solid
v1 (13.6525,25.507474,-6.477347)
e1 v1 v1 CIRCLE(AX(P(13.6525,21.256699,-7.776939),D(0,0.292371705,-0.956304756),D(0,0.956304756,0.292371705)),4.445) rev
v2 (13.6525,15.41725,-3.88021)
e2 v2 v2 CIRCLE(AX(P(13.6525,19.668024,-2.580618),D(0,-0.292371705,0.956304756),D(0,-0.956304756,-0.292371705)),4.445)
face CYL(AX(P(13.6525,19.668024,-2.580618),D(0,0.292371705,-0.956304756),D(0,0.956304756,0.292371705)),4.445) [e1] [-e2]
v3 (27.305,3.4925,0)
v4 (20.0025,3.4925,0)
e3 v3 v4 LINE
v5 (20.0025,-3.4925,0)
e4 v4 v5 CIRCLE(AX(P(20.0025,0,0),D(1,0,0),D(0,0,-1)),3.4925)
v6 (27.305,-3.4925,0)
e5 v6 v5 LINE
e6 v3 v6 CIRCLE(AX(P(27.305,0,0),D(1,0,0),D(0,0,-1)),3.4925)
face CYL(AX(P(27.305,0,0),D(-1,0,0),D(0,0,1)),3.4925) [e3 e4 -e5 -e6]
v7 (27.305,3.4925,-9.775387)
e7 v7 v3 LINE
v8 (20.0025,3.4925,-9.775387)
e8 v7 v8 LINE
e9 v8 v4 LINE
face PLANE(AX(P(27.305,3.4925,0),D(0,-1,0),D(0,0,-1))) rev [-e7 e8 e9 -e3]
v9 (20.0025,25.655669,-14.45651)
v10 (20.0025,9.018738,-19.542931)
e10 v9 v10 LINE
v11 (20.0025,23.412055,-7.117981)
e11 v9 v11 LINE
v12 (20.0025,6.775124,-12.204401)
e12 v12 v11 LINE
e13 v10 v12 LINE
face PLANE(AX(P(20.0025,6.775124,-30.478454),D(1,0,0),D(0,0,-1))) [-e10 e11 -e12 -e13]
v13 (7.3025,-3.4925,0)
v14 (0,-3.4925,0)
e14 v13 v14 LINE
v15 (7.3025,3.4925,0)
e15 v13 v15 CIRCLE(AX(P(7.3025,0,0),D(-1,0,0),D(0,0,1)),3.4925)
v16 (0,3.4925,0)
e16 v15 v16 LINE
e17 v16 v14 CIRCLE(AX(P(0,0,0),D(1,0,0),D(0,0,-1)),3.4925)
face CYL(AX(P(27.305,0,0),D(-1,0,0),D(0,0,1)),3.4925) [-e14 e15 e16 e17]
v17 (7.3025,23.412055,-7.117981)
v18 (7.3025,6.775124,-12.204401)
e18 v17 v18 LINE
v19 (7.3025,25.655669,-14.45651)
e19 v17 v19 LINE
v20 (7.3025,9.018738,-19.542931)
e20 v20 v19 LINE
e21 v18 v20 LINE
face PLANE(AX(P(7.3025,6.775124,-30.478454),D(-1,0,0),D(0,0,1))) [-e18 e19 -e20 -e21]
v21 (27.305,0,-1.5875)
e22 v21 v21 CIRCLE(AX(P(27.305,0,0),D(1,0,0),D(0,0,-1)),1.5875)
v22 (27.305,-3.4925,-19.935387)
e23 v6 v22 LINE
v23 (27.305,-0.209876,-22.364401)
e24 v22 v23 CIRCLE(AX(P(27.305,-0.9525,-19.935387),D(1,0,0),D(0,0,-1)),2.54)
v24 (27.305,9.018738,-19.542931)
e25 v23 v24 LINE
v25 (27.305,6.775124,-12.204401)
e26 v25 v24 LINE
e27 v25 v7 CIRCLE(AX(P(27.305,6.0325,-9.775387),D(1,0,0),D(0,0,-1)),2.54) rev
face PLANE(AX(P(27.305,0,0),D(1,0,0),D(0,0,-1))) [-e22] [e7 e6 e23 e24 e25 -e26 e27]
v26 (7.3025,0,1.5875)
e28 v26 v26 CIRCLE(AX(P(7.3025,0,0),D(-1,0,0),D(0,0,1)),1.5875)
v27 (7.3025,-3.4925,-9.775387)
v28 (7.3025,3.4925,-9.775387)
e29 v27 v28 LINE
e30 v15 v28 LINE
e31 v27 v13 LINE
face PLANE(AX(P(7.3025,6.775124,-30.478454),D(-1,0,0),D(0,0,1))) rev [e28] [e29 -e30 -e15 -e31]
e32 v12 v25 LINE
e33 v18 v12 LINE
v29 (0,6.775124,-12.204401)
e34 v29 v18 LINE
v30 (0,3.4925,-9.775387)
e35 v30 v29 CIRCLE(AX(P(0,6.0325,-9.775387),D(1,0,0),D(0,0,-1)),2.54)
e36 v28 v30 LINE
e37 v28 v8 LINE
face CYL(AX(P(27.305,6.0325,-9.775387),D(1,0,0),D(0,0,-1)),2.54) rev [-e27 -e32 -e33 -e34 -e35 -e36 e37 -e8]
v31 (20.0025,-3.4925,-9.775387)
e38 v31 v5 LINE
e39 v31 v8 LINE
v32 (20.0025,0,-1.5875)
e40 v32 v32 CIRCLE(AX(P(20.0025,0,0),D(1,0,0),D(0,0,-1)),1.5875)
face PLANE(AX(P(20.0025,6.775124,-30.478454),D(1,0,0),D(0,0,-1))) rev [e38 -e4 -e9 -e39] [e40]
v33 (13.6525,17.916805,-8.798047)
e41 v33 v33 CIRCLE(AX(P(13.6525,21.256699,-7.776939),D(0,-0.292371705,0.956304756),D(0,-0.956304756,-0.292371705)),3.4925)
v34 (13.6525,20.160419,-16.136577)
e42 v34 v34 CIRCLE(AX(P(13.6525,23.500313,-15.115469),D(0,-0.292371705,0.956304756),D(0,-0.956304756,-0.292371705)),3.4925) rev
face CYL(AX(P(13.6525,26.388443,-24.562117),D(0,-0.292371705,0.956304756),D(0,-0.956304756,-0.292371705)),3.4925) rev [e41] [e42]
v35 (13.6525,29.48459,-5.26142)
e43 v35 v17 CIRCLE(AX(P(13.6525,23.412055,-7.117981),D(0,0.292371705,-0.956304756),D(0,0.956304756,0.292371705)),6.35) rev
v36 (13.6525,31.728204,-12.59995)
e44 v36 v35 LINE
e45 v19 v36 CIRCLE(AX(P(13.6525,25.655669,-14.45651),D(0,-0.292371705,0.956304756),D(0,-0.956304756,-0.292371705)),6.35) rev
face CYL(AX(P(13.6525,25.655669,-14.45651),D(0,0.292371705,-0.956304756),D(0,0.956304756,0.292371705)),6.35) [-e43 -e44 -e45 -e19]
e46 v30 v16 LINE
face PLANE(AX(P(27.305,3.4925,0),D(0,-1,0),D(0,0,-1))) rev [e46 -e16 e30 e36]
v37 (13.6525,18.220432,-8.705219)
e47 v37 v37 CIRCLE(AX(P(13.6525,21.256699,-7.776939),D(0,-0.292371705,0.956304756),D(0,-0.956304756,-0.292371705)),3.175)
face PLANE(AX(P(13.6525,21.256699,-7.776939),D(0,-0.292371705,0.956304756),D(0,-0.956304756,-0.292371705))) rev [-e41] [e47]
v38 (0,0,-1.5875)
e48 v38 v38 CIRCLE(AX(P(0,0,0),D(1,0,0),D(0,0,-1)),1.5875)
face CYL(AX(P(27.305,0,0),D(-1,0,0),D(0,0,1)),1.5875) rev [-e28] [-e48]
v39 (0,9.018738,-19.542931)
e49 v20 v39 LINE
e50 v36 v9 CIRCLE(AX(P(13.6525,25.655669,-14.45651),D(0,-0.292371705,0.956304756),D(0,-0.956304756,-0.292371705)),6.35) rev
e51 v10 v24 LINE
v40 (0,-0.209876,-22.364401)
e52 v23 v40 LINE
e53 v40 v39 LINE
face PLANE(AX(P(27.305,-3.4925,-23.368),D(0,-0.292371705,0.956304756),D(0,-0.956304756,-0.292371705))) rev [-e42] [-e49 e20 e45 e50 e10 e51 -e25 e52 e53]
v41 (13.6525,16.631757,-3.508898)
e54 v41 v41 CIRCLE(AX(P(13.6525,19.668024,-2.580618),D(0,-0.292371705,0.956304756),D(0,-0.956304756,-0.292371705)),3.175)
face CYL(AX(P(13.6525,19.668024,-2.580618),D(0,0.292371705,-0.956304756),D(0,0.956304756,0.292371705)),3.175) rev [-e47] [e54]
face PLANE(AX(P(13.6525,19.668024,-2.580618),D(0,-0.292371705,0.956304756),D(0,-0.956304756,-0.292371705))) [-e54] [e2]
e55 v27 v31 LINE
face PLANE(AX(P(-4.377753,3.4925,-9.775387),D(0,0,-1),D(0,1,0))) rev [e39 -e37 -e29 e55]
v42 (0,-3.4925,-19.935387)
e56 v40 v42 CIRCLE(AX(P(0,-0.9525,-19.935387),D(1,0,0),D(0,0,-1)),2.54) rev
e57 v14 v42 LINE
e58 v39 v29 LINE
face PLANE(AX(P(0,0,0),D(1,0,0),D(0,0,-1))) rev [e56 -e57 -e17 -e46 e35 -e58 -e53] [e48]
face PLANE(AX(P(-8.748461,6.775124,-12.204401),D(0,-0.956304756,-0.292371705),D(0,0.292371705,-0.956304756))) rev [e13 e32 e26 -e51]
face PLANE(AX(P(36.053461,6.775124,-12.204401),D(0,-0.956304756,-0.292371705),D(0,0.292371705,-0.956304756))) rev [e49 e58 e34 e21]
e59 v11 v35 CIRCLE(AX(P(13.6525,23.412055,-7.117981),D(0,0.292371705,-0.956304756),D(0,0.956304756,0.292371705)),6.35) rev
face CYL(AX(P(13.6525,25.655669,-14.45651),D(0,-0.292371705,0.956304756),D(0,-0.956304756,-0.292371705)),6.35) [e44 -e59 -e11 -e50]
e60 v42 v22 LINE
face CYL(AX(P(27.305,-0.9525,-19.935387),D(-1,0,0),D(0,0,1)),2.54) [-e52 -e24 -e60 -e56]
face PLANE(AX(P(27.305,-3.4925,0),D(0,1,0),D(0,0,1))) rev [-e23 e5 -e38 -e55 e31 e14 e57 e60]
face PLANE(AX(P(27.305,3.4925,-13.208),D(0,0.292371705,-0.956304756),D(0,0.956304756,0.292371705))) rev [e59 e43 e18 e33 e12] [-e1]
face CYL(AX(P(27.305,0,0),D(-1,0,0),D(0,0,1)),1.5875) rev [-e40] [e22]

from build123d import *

# Parameters (mm, degrees)
SKETCH1_R                      = 1.5875
BOSS_EXTRUDE1_DEPTH            = 27.305
FILLET1_R                      = 2.54
CUT_EXTRUDE1_REACH             = 49.512
SKETCH2_W                      = 12.7
SKETCH2_H                      = 10.26762413
CUT_EXTRUDE1_DIRECTION_2_DEPTH = 48.511945714
SKETCH3_R                      = 4.445
SKETCH3_R_2                    = 3.175
BOSS_EXTRUDE2_DEPTH            = 5.43375
SKETCH4_R                      = 3.4925
CUT_EXTRUDE2_DEPTH             = 7.673839963
CUT_EXTRUDE3_DEPTH             = 7.3025
CUT_EXTRUDE4_DEPTH             = 7.3025
BOSS_EXTRUDE3_DEPTH            = 12.7
FILLET2_R                      = 6.35


with BuildPart() as part:
    # Sketch1 → Boss-Extrude1 (new body)
    with BuildSketch(Plane(origin=(0, 0, 0), x_dir=(0, 0, -1), z_dir=(1, 0, 0))):
        with BuildLine():
            Line((0, 3.4925), (13.208, 3.4925))
            Line((13.208, 3.4925), (5.261420462, 29.48459049))
            Line((5.261420462, 29.48459049), (12.599950115, 31.728204162))
            Line((12.599950115, 31.728204162), (23.368, -3.4925))
            Line((23.368, -3.4925), (0, -3.4925))
            ThreePointArc((0, -3.4925), (-3.4925, 0), (0, 3.4925))
        make_face()
        Circle(SKETCH1_R, mode=Mode.SUBTRACT)
    extrude(amount=BOSS_EXTRUDE1_DEPTH)

    # Fillet1
    fillet1_edges = [part.edges().sort_by_distance(p)[0] for p in [
        (13.6525, 3.4925, -13.208),
        (13.6525, -3.4925, -23.368),
    ]]
    fillet(fillet1_edges, radius=FILLET1_R)

    # Cut-Extrude1: up to this plane
    cut_extrude1_end = Plane(origin=(27.305, 3.4925, -13.208), z_dir=(0, 0.292371704722731, -0.9563047559630373))
    # Sketch2 → Cut-Extrude1 (cut, up to the surface)
    with BuildSketch(Plane.XY, mode=Mode.PRIVATE) as cut_extrude1_sk1:
        with Locations((13.6525, 1.641312065)):
            Rectangle(SKETCH2_W, SKETCH2_H)
    cut_extrude1_tool1 = split(extrude(cut_extrude1_sk1.sketch, amount=-CUT_EXTRUDE1_REACH, mode=Mode.PRIVATE), bisect_by=cut_extrude1_end, keep=Keep.BOTH, mode=Mode.PRIVATE)
    add(cut_extrude1_tool1.solids().sort_by_distance((13.6525, 1.641312, 0))[0], mode=Mode.SUBTRACT)

    # Sketch2 → Cut-Extrude1 direction 2 (cut)
    with BuildSketch(Plane.XY):
        with Locations((13.6525, 1.641312065)):
            Rectangle(SKETCH2_W, SKETCH2_H)
    extrude(amount=CUT_EXTRUDE1_DIRECTION_2_DEPTH, mode=Mode.SUBTRACT)

    # Sketch3 → Boss-Extrude2 (add)
    with BuildSketch(Plane(origin=(0, 3.991453073, -13.055454737), x_dir=(1, 0, 0), z_dir=(0, -0.2923717047227311, 0.9563047559630372))):
        with Locations(Location((13.6525, 18.054125632, 0), (0, 0, 90))):
            Circle(SKETCH3_R)
        with Locations(Location((13.6525, 18.054125632, 0), (0, 0, 270))):
            Circle(SKETCH3_R_2, mode=Mode.SUBTRACT)
    extrude(amount=BOSS_EXTRUDE2_DEPTH)

    # Sketch4 → Cut-Extrude2 (cut)
    with BuildSketch(Plane(origin=(0, 3.991453073, -13.055454737), x_dir=(1, 0, 0), z_dir=(0, -0.29237170472273094, 0.9563047559630372))):
        with Locations(Location((13.6525, 18.054125632, 0), (0, 0, 270))):
            Circle(SKETCH4_R)
    extrude(amount=-CUT_EXTRUDE2_DEPTH, mode=Mode.SUBTRACT)

    # Sketch5 → Cut-Extrude3 (cut)
    with BuildSketch(Plane.ZY):
        Polygon((-12.599950115, 31.728204162), (-5.261420462, 29.48459049), (-12.204401088, 6.77512413), (-19.542930741, 9.018737802), align=None)
    extrude(amount=-CUT_EXTRUDE3_DEPTH, mode=Mode.SUBTRACT)

    # Sketch6 → Cut-Extrude4 (cut)
    with BuildSketch(Plane(origin=(27.305, 0, 0), x_dir=(0, 0, -1), z_dir=(1, 0, 0))):
        Polygon((12.599950115, 31.728204162), (5.261420462, 29.48459049), (12.204401088, 6.77512413), (19.542930741, 9.018737802), align=None)
    extrude(amount=-CUT_EXTRUDE4_DEPTH, mode=Mode.SUBTRACT)

    # Sketch7 → Boss-Extrude3 (add)
    with BuildSketch(Plane.ZY.offset(-20.0025)):
        with BuildLine():
            Line((-9.775387008, 3.4925), (-9.775387008, -3.4925))
            Line((-9.775387008, -3.4925), (-15.34352881, -3.4925))
            Line((-15.34352881, -3.4925), (-12.204401088, 6.77512413))
            ThreePointArc((-12.204401088, 6.77512413), (-11.817183434, 4.521650122), (-9.775387008, 3.4925))
        make_face()
    extrude(amount=BOSS_EXTRUDE3_DEPTH)

    # Fillet2
    fillet2_edges = [part.edges().sort_by_distance(p)[0] for p in [
        (20.0025, 30.606397326, -8.930685288),
        (7.3025, 30.606397326, -8.930685288),
    ]]
    fillet(fillet2_edges, radius=FILLET2_R - 0.0001)  # a hair under: the kernel refuses the full size


solid = part.part
